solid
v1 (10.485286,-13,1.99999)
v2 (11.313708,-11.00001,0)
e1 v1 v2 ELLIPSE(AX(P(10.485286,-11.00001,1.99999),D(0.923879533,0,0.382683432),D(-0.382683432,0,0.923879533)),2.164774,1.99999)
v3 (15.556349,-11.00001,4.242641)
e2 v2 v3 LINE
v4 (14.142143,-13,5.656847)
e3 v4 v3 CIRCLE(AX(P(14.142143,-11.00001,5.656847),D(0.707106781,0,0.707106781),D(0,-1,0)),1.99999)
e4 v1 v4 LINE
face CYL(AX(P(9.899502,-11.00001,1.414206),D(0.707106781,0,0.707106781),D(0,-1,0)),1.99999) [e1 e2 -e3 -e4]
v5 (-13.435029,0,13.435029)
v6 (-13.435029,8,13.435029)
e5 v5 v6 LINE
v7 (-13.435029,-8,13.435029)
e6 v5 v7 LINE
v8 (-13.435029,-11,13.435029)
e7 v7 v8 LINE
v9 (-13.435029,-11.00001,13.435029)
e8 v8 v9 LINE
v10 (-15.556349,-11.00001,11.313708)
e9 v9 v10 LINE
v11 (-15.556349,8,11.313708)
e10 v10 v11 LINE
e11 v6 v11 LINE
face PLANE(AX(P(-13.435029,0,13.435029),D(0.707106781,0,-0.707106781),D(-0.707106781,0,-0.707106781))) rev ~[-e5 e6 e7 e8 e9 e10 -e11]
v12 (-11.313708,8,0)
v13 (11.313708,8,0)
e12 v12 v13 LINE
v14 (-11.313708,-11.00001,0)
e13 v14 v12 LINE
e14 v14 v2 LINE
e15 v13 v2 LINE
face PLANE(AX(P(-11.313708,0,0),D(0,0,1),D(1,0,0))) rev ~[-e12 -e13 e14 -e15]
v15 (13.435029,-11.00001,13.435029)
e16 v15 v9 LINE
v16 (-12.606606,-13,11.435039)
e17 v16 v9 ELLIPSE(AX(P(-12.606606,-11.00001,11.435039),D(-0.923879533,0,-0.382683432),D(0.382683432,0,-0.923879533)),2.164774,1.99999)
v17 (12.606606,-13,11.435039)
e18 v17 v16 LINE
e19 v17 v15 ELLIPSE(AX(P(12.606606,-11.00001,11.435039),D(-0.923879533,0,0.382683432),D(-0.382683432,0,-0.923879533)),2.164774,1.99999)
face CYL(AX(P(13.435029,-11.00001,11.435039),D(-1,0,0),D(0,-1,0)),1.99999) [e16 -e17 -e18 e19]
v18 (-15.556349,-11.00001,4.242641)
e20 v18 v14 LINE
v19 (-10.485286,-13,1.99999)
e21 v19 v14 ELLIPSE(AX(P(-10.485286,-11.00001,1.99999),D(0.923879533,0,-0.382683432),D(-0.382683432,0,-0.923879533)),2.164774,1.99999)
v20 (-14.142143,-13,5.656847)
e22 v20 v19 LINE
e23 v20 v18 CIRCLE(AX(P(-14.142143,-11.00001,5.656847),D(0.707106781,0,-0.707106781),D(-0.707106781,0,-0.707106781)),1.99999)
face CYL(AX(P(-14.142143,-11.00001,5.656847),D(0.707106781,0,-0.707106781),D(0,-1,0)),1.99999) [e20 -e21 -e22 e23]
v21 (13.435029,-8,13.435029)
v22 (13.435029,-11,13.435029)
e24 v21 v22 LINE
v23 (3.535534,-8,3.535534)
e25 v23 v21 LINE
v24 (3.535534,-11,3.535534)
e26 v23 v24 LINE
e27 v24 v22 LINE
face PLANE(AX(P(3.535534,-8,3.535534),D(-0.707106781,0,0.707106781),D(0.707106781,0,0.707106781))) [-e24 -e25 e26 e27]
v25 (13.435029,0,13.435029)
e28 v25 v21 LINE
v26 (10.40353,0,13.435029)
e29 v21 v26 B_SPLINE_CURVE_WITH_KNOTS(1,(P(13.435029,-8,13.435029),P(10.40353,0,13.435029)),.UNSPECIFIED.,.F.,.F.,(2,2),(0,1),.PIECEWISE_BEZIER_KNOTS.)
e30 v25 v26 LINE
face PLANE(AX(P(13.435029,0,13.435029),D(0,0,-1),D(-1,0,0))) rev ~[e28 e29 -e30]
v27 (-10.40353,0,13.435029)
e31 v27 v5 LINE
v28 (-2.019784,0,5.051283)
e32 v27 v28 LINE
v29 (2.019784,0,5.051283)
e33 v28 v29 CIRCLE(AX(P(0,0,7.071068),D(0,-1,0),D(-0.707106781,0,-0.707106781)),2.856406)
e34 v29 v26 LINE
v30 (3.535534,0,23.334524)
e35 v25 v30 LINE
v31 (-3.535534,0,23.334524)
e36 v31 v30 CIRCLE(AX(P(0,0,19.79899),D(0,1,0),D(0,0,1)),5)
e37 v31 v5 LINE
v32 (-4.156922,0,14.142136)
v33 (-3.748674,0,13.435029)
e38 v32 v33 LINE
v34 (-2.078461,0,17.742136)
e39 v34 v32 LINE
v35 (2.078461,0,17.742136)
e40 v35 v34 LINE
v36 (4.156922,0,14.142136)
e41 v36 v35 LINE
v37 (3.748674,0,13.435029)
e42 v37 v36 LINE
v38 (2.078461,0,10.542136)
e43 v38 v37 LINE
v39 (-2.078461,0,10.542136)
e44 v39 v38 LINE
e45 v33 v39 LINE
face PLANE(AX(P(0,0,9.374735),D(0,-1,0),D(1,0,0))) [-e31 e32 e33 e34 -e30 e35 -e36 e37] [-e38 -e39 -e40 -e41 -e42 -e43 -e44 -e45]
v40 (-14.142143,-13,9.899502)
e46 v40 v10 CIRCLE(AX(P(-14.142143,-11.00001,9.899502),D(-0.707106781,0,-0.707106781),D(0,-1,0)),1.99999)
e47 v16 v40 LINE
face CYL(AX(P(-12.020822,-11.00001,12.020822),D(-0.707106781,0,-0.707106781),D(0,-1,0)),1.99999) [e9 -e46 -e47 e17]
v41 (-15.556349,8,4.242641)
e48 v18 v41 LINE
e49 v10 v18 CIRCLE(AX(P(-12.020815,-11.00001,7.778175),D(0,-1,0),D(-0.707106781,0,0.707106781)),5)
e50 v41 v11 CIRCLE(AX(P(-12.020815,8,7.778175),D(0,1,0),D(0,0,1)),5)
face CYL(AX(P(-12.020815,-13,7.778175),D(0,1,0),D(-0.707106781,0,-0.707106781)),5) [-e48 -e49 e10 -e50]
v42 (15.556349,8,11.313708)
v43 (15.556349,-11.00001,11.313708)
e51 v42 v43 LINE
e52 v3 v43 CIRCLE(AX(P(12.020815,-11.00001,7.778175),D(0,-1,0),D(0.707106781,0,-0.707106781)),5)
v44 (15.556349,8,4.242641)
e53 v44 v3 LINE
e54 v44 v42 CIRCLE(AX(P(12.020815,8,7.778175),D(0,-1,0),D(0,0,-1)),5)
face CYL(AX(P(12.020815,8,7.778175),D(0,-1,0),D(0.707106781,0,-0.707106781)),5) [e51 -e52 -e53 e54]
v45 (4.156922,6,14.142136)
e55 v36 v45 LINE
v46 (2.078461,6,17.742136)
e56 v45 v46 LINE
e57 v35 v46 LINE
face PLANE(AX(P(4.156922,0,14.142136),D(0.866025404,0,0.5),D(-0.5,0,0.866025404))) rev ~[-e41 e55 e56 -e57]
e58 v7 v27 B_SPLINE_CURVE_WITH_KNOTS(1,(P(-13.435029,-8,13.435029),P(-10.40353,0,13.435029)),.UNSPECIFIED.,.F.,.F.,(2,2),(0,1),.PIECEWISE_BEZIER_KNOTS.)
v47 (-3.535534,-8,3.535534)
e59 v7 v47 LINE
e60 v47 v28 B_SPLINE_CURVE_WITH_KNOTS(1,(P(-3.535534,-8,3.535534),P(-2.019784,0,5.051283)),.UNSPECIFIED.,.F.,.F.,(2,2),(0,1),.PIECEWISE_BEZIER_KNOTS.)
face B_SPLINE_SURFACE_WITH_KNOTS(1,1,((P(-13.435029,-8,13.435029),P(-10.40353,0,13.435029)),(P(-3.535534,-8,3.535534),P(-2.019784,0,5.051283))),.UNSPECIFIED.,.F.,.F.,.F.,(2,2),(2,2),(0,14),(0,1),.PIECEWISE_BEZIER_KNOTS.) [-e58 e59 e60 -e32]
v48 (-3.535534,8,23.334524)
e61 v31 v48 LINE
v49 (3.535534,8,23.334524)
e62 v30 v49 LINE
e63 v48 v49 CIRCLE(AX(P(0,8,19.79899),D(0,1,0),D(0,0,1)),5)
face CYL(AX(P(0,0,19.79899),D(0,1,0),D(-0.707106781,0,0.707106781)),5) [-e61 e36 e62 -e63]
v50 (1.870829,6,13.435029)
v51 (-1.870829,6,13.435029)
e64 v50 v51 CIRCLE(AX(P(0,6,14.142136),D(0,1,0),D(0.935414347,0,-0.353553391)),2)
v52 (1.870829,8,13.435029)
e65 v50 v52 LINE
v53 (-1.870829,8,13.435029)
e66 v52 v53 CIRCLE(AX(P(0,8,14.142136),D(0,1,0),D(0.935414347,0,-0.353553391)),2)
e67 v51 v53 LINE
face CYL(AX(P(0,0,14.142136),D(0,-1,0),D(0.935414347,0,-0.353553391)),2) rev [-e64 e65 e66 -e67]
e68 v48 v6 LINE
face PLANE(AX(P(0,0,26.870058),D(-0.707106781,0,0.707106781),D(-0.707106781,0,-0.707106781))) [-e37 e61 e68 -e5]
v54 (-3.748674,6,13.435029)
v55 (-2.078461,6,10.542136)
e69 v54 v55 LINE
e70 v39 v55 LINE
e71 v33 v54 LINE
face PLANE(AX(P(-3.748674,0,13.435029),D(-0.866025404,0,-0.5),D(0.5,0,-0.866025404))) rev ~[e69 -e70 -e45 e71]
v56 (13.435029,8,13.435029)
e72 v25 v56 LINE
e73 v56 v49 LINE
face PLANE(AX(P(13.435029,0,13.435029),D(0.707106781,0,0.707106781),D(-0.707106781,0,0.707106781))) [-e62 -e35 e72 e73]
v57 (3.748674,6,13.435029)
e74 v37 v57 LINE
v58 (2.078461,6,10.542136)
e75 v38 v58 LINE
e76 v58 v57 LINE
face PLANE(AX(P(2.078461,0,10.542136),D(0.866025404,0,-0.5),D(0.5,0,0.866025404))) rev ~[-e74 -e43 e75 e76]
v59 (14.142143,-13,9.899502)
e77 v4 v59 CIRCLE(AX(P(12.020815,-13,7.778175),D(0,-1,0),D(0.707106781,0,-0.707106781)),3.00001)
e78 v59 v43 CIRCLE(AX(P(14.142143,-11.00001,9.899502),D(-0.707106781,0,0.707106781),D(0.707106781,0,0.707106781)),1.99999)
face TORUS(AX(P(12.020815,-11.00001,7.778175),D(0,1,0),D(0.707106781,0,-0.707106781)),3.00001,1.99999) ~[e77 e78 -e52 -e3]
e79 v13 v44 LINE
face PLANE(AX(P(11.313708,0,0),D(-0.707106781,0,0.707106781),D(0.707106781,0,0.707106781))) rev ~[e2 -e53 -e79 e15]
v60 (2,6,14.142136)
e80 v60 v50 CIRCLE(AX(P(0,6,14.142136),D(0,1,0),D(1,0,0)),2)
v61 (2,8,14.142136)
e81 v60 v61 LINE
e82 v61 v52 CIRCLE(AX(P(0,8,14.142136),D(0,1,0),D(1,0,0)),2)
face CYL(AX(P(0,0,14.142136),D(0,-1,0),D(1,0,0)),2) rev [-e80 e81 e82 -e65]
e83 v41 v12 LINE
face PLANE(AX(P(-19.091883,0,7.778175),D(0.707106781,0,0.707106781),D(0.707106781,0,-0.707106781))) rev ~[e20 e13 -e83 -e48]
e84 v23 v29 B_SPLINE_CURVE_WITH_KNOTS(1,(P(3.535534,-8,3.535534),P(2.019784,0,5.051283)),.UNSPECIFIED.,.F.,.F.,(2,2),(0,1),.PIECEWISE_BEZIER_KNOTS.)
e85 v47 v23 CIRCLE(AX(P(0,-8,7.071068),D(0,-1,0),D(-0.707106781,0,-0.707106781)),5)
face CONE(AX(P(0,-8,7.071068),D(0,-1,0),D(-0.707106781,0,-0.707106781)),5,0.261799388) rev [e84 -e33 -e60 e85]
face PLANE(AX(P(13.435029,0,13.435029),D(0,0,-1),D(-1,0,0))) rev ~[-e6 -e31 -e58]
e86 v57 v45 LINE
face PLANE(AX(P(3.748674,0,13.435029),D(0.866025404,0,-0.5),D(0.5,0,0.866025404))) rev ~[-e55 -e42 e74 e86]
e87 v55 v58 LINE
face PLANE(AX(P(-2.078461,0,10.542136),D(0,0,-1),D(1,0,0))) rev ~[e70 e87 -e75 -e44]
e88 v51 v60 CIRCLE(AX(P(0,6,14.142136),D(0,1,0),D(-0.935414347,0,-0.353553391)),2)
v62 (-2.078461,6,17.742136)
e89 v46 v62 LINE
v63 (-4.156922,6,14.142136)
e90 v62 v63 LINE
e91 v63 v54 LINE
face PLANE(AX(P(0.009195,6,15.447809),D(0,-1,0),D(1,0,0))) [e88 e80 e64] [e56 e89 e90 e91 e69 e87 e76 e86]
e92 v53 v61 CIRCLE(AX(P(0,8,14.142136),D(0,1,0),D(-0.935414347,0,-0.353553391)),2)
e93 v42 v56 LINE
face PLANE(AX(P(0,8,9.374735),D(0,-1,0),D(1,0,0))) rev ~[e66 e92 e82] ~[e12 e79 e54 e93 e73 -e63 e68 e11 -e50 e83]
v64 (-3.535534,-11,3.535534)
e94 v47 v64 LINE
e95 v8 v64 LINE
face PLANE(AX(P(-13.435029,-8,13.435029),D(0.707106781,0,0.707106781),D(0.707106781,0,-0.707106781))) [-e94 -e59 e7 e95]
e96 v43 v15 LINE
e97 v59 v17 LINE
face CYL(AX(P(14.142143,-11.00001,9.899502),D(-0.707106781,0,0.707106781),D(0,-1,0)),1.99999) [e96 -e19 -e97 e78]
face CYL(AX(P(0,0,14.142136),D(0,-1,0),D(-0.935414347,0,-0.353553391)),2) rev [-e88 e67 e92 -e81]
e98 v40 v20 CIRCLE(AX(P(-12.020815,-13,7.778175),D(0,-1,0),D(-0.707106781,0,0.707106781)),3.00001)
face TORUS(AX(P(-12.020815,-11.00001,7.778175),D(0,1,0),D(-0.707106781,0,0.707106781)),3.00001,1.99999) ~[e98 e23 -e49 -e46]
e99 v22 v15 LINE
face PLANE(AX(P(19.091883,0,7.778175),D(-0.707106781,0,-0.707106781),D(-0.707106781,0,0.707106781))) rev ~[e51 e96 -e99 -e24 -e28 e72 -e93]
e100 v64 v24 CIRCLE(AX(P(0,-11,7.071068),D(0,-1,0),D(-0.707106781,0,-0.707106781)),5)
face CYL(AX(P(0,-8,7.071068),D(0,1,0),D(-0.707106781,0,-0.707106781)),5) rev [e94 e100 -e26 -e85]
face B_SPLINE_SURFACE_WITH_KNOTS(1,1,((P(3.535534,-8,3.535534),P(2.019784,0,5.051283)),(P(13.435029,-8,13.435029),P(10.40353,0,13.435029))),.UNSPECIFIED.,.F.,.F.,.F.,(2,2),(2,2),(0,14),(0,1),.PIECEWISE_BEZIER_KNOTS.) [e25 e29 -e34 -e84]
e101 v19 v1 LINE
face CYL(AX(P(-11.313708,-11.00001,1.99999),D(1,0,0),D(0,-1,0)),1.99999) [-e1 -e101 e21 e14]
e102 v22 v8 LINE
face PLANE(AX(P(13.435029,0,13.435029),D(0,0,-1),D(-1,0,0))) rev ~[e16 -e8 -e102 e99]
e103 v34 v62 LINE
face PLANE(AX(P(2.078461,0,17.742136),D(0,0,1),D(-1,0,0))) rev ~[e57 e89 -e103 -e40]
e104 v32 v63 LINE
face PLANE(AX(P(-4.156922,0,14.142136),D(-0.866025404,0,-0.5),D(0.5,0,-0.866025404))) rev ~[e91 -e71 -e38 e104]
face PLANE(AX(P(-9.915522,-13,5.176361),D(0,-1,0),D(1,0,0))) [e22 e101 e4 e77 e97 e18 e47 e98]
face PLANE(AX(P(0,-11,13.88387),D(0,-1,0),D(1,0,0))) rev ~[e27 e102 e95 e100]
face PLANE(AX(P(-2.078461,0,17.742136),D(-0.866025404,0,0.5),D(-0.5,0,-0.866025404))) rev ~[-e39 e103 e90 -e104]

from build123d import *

# Parameters (mm, degrees)
F1_DEPTH = 8
F2_DEPTH = 6
F3_DEPTH = 13
F6_DEPTH = 8
F6_TAPER = 15
F7_DEPTH = 3
F8_R     = 5
F9_R     = 1.99999


# Not quite as in the source:
# - a fillet or chamfer is up to 0.001 mm smaller than in the source, because OpenCascade refuses the exact size


with BuildPart() as f1:
    # F0 (on Front) → F1 (new body)
    with BuildSketch(Plane.XZ):
        Polygon((-13.4350288425, 13.4350288425), (0, 0), (13.4350288425, 13.4350288425), (3.7486736477, 13.4350288425), (2.0784609691, 10.5421356237), (-2.0784609691, 10.5421356237), (-3.7486736477, 13.4350288425), align=None)
        Polygon((3.7486736477, 13.4350288425), (13.4350288425, 13.4350288425), (0, 26.8700576851), (-13.4350288425, 13.4350288425), (-3.7486736477, 13.4350288425), (-4.1569219382, 14.1421356237), (-2.0784609691, 17.7421356237), (2.0784609691, 17.7421356237), (4.1569219382, 14.1421356237), align=None)
        Polygon((-11.313708499, 0), (0, 0), (-13.4350288425, 13.4350288425), (-19.091883092, 7.7781745931), align=None)
        Polygon((13.4350288425, 13.4350288425), (0, 0), (11.313708499, 0), (19.091883092, 7.7781745931), align=None)
        with BuildLine():
            Line((1.8708286934, 13.4350288425), (3.7486736477, 13.4350288425))
            Line((3.7486736477, 13.4350288425), (4.1569219382, 14.1421356237))
            Line((4.1569219382, 14.1421356237), (2.0784609691, 17.7421356237))
            Line((2.0784609691, 17.7421356237), (-2.0784609691, 17.7421356237))
            Line((-2.0784609691, 17.7421356237), (-4.1569219382, 14.1421356237))
            Line((-4.1569219382, 14.1421356237), (-3.7486736477, 13.4350288425))
            Line((-3.7486736477, 13.4350288425), (-1.8708286934, 13.4350288425))
            ThreePointArc((-1.8708286934, 13.4350288425), (-0.3594040993, 16.109577794), (2, 14.1421356237))
            ThreePointArc((2, 14.1421356237), (1.9674421703, 13.7827315244), (1.8708286934, 13.4350288425))
        make_face()
        with BuildLine():
            Line((2.0784609691, 10.5421356237), (3.7486736477, 13.4350288425))
            Line((3.7486736477, 13.4350288425), (1.8708286934, 13.4350288425))
            ThreePointArc((1.8708286934, 13.4350288425), (0, 12.1421356237), (-1.8708286934, 13.4350288425))
            Line((-1.8708286934, 13.4350288425), (-3.7486736477, 13.4350288425))
            Line((-3.7486736477, 13.4350288425), (-2.0784609691, 10.5421356237))
            Line((-2.0784609691, 10.5421356237), (2.0784609691, 10.5421356237))
        make_face()
    extrude(amount=-F1_DEPTH)

    # F0 (on Front) → F2 (cut)
    with BuildSketch(Plane.XZ):
        with BuildLine():
            Line((1.8708286934, 13.4350288425), (3.7486736477, 13.4350288425))
            Line((3.7486736477, 13.4350288425), (4.1569219382, 14.1421356237))
            Line((4.1569219382, 14.1421356237), (2.0784609691, 17.7421356237))
            Line((2.0784609691, 17.7421356237), (-2.0784609691, 17.7421356237))
            Line((-2.0784609691, 17.7421356237), (-4.1569219382, 14.1421356237))
            Line((-4.1569219382, 14.1421356237), (-3.7486736477, 13.4350288425))
            Line((-3.7486736477, 13.4350288425), (-1.8708286934, 13.4350288425))
            ThreePointArc((-1.8708286934, 13.4350288425), (-0.3594040993, 16.109577794), (2, 14.1421356237))
            ThreePointArc((2, 14.1421356237), (1.9674421703, 13.7827315244), (1.8708286934, 13.4350288425))
        make_face()
        with BuildLine():
            Line((2.0784609691, 10.5421356237), (3.7486736477, 13.4350288425))
            Line((3.7486736477, 13.4350288425), (1.8708286934, 13.4350288425))
            ThreePointArc((1.8708286934, 13.4350288425), (0, 12.1421356237), (-1.8708286934, 13.4350288425))
            Line((-1.8708286934, 13.4350288425), (-3.7486736477, 13.4350288425))
            Line((-3.7486736477, 13.4350288425), (-2.0784609691, 10.5421356237))
            Line((-2.0784609691, 10.5421356237), (2.0784609691, 10.5421356237))
        make_face()
    extrude(amount=-F2_DEPTH, mode=Mode.SUBTRACT)

    # F0 (on Front) → F3 (join)
    with BuildSketch(Plane.XZ):
        Polygon((-11.313708499, 0), (0, 0), (-13.4350288425, 13.4350288425), (-19.091883092, 7.7781745931), align=None)
        Polygon((-13.4350288425, 13.4350288425), (0, 0), (13.4350288425, 13.4350288425), (3.7486736477, 13.4350288425), (2.0784609691, 10.5421356237), (-2.0784609691, 10.5421356237), (-3.7486736477, 13.4350288425), align=None)
        Polygon((13.4350288425, 13.4350288425), (0, 0), (11.313708499, 0), (19.091883092, 7.7781745931), align=None)
        with BuildLine():
            ThreePointArc((-1.8708286934, 13.4350288425), (0, 12.1421356237), (1.8708286934, 13.4350288425))
            Line((1.8708286934, 13.4350288425), (0, 13.4350288425))
            Line((0, 13.4350288425), (-1.8708286934, 13.4350288425))
        make_face()
        with BuildLine():
            Line((2.0784609691, 10.5421356237), (3.7486736477, 13.4350288425))
            Line((3.7486736477, 13.4350288425), (1.8708286934, 13.4350288425))
            ThreePointArc((1.8708286934, 13.4350288425), (0, 12.1421356237), (-1.8708286934, 13.4350288425))
            Line((-1.8708286934, 13.4350288425), (-3.7486736477, 13.4350288425))
            Line((-3.7486736477, 13.4350288425), (-2.0784609691, 10.5421356237))
            Line((-2.0784609691, 10.5421356237), (2.0784609691, 10.5421356237))
        make_face()
    extrude(amount=F3_DEPTH)

    # F5 (on offset) → F6 (cut)
    with BuildSketch(Plane.XZ.offset(8)):
        with BuildLine():
            Line((0, 26.8700576851), (-13.4350288425, 13.4350288425))
            Line((-13.4350288425, 13.4350288425), (-3.5355339059, 3.5355339059))
            ThreePointArc((-3.5355339059, 3.5355339059), (0, 2.0710678119), (3.5355339059, 3.5355339059))
            Line((3.5355339059, 3.5355339059), (13.4350288425, 13.4350288425))
            Line((13.4350288425, 13.4350288425), (0, 26.8700576851))
        make_face()
    extrude(amount=-F6_DEPTH, taper=F6_TAPER, mode=Mode.SUBTRACT)

    # F5 (on offset) → F7 (cut)
    with BuildSketch(Plane.XZ.offset(8)):
        with BuildLine():
            Line((0, 26.8700576851), (-13.4350288425, 13.4350288425))
            Line((-13.4350288425, 13.4350288425), (-3.5355339059, 3.5355339059))
            ThreePointArc((-3.5355339059, 3.5355339059), (0, 2.0710678119), (3.5355339059, 3.5355339059))
            Line((3.5355339059, 3.5355339059), (13.4350288425, 13.4350288425))
            Line((13.4350288425, 13.4350288425), (0, 26.8700576851))
        make_face()
    extrude(amount=F7_DEPTH, mode=Mode.SUBTRACT)

    # F8
    f8_edges = [f1.edges().sort_by_distance(p)[0] for p in [
        (-19.091883, -2.5, 7.778175),
        (0, 4, 26.870058),
        (19.091883, -2.5, 7.778175),
    ]]
    fillet(f8_edges, radius=F8_R)

    # F9 (radius 2 in the source; OpenCascade refuses exactly that, so slightly less here)
    f9_edges = [f1.edges().sort_by_distance(p)[0] for p in [
        (-14.495689, -13, 12.374369),
        (-17.020815, -13, 7.778175),
        (0, -13, 13.435029),
        (-13.435029, -13, 2.12132),
        (14.495689, -13, 12.374369),
        (0, -13, 0),
        (17.020815, -13, 7.778175),
        (13.435029, -13, 2.12132),
    ]]
    fillet(f9_edges, radius=F9_R)


solid = f1.part
